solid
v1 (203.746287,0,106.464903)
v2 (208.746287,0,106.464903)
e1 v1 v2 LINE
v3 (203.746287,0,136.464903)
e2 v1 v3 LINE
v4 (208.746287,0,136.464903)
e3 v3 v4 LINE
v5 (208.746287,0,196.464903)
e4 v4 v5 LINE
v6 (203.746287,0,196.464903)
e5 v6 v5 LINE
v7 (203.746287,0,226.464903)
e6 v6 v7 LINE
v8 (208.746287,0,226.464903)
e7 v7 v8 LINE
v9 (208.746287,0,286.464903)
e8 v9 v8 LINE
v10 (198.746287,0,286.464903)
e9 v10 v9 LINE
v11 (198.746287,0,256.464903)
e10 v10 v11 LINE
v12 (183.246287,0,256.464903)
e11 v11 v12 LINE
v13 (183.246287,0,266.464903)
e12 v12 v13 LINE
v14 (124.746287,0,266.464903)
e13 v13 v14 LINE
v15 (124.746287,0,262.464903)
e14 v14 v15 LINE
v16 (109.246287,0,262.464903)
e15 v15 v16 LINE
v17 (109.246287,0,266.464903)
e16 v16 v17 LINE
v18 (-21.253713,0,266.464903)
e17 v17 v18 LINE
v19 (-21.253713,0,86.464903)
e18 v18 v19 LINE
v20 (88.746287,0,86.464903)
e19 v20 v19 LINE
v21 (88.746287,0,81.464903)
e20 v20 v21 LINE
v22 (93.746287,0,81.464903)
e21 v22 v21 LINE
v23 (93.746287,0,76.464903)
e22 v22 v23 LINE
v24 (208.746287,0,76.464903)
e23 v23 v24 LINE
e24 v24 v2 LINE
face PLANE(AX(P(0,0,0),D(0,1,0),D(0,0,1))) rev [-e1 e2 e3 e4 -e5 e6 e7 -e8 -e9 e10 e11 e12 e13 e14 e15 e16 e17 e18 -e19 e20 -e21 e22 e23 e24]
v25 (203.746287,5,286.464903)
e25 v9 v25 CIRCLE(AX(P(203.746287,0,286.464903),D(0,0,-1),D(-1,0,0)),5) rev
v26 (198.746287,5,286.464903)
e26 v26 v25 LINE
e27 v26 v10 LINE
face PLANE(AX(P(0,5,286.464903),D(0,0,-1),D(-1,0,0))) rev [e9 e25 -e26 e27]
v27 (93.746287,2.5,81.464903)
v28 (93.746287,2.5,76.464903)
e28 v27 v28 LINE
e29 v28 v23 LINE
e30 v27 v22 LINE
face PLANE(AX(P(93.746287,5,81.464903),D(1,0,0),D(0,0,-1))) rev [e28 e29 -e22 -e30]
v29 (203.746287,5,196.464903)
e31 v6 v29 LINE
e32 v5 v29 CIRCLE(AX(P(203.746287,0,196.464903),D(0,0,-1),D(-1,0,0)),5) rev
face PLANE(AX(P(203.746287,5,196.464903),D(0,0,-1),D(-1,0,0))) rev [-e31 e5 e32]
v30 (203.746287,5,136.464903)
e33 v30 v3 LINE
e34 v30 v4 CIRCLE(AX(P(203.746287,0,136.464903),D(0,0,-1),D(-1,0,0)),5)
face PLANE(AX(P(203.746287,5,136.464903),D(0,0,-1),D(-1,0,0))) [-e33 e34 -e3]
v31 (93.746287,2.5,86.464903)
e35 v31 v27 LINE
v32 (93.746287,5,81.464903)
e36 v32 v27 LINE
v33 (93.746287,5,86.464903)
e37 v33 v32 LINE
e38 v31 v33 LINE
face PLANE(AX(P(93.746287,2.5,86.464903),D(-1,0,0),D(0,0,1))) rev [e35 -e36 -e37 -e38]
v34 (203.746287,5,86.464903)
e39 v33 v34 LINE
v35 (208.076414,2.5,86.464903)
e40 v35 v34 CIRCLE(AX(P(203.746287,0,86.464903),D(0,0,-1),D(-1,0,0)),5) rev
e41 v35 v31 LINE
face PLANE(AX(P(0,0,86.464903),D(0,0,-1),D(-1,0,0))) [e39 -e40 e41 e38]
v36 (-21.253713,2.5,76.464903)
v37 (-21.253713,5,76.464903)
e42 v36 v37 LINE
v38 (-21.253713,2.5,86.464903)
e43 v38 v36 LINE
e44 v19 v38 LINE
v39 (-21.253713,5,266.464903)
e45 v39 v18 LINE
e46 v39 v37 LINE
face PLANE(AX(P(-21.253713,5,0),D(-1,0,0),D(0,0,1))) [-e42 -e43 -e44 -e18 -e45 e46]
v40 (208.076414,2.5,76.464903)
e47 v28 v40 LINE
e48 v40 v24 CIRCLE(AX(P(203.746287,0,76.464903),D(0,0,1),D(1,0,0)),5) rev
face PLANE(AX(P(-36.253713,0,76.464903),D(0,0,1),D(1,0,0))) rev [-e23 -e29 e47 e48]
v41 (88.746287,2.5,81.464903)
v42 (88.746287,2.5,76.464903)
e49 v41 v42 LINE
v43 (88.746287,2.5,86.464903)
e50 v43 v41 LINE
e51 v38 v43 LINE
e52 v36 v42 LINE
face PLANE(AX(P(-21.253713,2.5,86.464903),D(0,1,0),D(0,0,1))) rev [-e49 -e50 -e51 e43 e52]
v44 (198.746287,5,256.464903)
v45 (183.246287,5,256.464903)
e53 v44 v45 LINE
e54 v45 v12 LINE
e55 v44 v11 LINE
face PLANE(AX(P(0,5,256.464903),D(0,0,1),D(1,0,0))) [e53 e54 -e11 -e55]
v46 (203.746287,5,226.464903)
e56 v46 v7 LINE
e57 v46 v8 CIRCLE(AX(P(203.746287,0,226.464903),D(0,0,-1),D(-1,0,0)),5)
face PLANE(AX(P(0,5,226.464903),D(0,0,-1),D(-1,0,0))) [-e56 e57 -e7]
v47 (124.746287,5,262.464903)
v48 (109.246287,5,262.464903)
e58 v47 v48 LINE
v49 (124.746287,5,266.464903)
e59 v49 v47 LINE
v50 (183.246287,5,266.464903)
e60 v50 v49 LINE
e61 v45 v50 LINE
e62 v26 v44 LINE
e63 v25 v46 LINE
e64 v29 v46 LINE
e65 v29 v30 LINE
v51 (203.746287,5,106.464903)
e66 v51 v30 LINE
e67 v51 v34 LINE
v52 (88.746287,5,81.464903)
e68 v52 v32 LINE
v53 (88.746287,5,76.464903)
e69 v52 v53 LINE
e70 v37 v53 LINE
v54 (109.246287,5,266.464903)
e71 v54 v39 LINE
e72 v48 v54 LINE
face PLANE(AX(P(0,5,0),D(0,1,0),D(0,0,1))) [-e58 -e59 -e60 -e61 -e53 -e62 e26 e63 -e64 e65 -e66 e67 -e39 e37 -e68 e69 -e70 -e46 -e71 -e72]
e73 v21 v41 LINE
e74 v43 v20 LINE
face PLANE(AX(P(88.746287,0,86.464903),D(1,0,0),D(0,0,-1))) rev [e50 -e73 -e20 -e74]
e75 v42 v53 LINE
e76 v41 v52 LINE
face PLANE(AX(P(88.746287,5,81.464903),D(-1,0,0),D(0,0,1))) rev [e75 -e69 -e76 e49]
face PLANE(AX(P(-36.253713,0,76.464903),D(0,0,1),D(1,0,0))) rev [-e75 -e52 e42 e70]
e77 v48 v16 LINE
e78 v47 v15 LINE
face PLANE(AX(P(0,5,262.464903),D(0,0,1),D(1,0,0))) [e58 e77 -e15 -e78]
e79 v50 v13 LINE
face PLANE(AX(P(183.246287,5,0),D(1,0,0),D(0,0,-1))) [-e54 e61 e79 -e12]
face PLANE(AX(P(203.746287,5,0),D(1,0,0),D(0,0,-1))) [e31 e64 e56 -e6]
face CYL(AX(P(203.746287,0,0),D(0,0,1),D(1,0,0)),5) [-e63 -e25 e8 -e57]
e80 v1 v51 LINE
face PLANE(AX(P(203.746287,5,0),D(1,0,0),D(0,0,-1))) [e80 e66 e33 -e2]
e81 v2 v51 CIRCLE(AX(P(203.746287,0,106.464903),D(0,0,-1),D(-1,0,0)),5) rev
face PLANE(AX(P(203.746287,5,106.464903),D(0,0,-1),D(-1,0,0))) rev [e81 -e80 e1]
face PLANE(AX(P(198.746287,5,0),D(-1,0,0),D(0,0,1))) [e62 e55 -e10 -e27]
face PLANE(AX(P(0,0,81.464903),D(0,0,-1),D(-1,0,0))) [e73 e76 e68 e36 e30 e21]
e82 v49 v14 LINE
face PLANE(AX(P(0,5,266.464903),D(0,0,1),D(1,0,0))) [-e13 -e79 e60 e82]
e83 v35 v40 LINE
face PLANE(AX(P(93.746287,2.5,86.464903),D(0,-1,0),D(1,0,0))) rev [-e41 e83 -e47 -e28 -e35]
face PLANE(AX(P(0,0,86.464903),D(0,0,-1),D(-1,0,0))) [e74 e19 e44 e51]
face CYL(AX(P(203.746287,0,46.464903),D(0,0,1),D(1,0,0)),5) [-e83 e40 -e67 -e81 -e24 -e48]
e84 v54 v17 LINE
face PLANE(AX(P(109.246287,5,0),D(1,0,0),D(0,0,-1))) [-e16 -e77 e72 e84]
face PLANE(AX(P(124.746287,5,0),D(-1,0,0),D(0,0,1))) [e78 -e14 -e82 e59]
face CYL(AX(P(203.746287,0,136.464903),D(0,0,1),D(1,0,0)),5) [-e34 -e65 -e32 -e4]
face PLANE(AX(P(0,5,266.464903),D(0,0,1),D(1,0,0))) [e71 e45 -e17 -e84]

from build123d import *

# Parameters (mm, degrees)
SKETCH_1_W          = 5
SKETCH_1_H          = 60
SKETCH_1_W_2        = 30
SKETCH_1_H_2        = 5
SKETCH_1_W_3        = 15
EXTRUDE_1_DEPTH     = 5
FILLET_1_R          = 5
SKETCH_2_W          = 245
SKETCH_2_H          = 125
CUT_EXTRUDE_1_DEPTH = 5
SKETCH_3_W          = 110
SKETCH_3_H          = 2.5
SKETCH_3_W_2        = 115
CUT_EXTRUDE_2_DEPTH = 10
SKETCH_4_W          = 5
SKETCH_4_H          = 5
CUT_EXTRUDE_3_DEPTH = 5


with BuildPart() as part:
    # 草圖1 → 填料-伸長1 (new body)
    with BuildSketch(Plane(origin=(0, 0, 0), x_dir=(1, 0, 0), z_dir=(0, 1, 0))):
        Polygon((198.746286718, -286.464902661), (198.746286718, -256.464902661), (183.246286718, -256.464902661), (183.246286718, -266.464902661), (124.746286718, -266.464902661), (124.746286718, -262.464902661), (109.246286718, -262.464902661), (109.246286718, -266.464902661), (-21.253713282, -266.464902661), (-21.253713282, 38.535097339), (-36.253713282, 38.535097339), (-36.253713282, 43.535097339), (203.746286718, 43.535097339), (203.746286718, -286.464902661), align=None)
        with Locations((206.246286718, -256.464902661)):
            Rectangle(SKETCH_1_W, SKETCH_1_H)
        with Locations((206.246286718, 13.535097339)):
            Rectangle(SKETCH_1_W, SKETCH_1_H)
        with Locations((188.746286718, 46.035097339)):
            Rectangle(SKETCH_1_W_2, SKETCH_1_H_2)
        with Locations((-21.253713282, 46.035097339)):
            Rectangle(SKETCH_1_W_2, SKETCH_1_H_2)
        with Locations((91.246286718, 46.035097339)):
            Rectangle(SKETCH_1_W_3, SKETCH_1_H_2)
        with Locations((76.246286718, 46.035097339)):
            Rectangle(SKETCH_1_W_3, SKETCH_1_H_2)
        with Locations((206.246286718, -166.464902661)):
            Rectangle(SKETCH_1_W, SKETCH_1_H)
        with Locations((206.246286718, -76.464902661)):
            Rectangle(SKETCH_1_W, SKETCH_1_H)
    extrude(amount=EXTRUDE_1_DEPTH)

    # 圓角1
    fillet_1_edges = [part.edges().sort_by_distance(p)[0] for p in [
        (208.746286718, 5, -13.535097339),
        (208.746286718, 5, 76.464902661),
        (208.746286718, 5, 166.464902661),
        (208.746286718, 5, 256.464902661),
    ]]
    fillet(fillet_1_edges, radius=FILLET_1_R - 0.0001)  # a hair under: the kernel refuses the full size

    # 草圖2 → 除料-伸長1 (cut)
    with BuildSketch(Plane(origin=(0, 5, 0), x_dir=(1, 0, 0), z_dir=(0, 1, 0))):
        with Locations((86.246286718, -13.964902661)):
            Rectangle(SKETCH_2_W, SKETCH_2_H)
    extrude(amount=-CUT_EXTRUDE_1_DEPTH, mode=Mode.SUBTRACT)

    # 草圖3 → 除料-伸長2 (cut)
    with BuildSketch(Plane(origin=(0, 0, 76.464902661), x_dir=(-1, 0, 0), z_dir=(0, 0, -1))):
        with Locations((-33.746286718, 1.25)):
            Rectangle(SKETCH_3_W, SKETCH_3_H)
        with Locations((-151.246286718, 3.75)):
            Rectangle(SKETCH_3_W_2, SKETCH_3_H)
    extrude(amount=-CUT_EXTRUDE_2_DEPTH, mode=Mode.SUBTRACT)

    # 草圖4 → 除料-伸長3 (cut)
    with BuildSketch(Plane(origin=(0, 0, 76.464902661), x_dir=(-1, 0, 0), z_dir=(0, 0, -1))):
        with Locations((-91.246286718, 2.5)):
            Rectangle(SKETCH_4_W, SKETCH_4_H)
    extrude(amount=-CUT_EXTRUDE_3_DEPTH, mode=Mode.SUBTRACT)


solid = part.part
